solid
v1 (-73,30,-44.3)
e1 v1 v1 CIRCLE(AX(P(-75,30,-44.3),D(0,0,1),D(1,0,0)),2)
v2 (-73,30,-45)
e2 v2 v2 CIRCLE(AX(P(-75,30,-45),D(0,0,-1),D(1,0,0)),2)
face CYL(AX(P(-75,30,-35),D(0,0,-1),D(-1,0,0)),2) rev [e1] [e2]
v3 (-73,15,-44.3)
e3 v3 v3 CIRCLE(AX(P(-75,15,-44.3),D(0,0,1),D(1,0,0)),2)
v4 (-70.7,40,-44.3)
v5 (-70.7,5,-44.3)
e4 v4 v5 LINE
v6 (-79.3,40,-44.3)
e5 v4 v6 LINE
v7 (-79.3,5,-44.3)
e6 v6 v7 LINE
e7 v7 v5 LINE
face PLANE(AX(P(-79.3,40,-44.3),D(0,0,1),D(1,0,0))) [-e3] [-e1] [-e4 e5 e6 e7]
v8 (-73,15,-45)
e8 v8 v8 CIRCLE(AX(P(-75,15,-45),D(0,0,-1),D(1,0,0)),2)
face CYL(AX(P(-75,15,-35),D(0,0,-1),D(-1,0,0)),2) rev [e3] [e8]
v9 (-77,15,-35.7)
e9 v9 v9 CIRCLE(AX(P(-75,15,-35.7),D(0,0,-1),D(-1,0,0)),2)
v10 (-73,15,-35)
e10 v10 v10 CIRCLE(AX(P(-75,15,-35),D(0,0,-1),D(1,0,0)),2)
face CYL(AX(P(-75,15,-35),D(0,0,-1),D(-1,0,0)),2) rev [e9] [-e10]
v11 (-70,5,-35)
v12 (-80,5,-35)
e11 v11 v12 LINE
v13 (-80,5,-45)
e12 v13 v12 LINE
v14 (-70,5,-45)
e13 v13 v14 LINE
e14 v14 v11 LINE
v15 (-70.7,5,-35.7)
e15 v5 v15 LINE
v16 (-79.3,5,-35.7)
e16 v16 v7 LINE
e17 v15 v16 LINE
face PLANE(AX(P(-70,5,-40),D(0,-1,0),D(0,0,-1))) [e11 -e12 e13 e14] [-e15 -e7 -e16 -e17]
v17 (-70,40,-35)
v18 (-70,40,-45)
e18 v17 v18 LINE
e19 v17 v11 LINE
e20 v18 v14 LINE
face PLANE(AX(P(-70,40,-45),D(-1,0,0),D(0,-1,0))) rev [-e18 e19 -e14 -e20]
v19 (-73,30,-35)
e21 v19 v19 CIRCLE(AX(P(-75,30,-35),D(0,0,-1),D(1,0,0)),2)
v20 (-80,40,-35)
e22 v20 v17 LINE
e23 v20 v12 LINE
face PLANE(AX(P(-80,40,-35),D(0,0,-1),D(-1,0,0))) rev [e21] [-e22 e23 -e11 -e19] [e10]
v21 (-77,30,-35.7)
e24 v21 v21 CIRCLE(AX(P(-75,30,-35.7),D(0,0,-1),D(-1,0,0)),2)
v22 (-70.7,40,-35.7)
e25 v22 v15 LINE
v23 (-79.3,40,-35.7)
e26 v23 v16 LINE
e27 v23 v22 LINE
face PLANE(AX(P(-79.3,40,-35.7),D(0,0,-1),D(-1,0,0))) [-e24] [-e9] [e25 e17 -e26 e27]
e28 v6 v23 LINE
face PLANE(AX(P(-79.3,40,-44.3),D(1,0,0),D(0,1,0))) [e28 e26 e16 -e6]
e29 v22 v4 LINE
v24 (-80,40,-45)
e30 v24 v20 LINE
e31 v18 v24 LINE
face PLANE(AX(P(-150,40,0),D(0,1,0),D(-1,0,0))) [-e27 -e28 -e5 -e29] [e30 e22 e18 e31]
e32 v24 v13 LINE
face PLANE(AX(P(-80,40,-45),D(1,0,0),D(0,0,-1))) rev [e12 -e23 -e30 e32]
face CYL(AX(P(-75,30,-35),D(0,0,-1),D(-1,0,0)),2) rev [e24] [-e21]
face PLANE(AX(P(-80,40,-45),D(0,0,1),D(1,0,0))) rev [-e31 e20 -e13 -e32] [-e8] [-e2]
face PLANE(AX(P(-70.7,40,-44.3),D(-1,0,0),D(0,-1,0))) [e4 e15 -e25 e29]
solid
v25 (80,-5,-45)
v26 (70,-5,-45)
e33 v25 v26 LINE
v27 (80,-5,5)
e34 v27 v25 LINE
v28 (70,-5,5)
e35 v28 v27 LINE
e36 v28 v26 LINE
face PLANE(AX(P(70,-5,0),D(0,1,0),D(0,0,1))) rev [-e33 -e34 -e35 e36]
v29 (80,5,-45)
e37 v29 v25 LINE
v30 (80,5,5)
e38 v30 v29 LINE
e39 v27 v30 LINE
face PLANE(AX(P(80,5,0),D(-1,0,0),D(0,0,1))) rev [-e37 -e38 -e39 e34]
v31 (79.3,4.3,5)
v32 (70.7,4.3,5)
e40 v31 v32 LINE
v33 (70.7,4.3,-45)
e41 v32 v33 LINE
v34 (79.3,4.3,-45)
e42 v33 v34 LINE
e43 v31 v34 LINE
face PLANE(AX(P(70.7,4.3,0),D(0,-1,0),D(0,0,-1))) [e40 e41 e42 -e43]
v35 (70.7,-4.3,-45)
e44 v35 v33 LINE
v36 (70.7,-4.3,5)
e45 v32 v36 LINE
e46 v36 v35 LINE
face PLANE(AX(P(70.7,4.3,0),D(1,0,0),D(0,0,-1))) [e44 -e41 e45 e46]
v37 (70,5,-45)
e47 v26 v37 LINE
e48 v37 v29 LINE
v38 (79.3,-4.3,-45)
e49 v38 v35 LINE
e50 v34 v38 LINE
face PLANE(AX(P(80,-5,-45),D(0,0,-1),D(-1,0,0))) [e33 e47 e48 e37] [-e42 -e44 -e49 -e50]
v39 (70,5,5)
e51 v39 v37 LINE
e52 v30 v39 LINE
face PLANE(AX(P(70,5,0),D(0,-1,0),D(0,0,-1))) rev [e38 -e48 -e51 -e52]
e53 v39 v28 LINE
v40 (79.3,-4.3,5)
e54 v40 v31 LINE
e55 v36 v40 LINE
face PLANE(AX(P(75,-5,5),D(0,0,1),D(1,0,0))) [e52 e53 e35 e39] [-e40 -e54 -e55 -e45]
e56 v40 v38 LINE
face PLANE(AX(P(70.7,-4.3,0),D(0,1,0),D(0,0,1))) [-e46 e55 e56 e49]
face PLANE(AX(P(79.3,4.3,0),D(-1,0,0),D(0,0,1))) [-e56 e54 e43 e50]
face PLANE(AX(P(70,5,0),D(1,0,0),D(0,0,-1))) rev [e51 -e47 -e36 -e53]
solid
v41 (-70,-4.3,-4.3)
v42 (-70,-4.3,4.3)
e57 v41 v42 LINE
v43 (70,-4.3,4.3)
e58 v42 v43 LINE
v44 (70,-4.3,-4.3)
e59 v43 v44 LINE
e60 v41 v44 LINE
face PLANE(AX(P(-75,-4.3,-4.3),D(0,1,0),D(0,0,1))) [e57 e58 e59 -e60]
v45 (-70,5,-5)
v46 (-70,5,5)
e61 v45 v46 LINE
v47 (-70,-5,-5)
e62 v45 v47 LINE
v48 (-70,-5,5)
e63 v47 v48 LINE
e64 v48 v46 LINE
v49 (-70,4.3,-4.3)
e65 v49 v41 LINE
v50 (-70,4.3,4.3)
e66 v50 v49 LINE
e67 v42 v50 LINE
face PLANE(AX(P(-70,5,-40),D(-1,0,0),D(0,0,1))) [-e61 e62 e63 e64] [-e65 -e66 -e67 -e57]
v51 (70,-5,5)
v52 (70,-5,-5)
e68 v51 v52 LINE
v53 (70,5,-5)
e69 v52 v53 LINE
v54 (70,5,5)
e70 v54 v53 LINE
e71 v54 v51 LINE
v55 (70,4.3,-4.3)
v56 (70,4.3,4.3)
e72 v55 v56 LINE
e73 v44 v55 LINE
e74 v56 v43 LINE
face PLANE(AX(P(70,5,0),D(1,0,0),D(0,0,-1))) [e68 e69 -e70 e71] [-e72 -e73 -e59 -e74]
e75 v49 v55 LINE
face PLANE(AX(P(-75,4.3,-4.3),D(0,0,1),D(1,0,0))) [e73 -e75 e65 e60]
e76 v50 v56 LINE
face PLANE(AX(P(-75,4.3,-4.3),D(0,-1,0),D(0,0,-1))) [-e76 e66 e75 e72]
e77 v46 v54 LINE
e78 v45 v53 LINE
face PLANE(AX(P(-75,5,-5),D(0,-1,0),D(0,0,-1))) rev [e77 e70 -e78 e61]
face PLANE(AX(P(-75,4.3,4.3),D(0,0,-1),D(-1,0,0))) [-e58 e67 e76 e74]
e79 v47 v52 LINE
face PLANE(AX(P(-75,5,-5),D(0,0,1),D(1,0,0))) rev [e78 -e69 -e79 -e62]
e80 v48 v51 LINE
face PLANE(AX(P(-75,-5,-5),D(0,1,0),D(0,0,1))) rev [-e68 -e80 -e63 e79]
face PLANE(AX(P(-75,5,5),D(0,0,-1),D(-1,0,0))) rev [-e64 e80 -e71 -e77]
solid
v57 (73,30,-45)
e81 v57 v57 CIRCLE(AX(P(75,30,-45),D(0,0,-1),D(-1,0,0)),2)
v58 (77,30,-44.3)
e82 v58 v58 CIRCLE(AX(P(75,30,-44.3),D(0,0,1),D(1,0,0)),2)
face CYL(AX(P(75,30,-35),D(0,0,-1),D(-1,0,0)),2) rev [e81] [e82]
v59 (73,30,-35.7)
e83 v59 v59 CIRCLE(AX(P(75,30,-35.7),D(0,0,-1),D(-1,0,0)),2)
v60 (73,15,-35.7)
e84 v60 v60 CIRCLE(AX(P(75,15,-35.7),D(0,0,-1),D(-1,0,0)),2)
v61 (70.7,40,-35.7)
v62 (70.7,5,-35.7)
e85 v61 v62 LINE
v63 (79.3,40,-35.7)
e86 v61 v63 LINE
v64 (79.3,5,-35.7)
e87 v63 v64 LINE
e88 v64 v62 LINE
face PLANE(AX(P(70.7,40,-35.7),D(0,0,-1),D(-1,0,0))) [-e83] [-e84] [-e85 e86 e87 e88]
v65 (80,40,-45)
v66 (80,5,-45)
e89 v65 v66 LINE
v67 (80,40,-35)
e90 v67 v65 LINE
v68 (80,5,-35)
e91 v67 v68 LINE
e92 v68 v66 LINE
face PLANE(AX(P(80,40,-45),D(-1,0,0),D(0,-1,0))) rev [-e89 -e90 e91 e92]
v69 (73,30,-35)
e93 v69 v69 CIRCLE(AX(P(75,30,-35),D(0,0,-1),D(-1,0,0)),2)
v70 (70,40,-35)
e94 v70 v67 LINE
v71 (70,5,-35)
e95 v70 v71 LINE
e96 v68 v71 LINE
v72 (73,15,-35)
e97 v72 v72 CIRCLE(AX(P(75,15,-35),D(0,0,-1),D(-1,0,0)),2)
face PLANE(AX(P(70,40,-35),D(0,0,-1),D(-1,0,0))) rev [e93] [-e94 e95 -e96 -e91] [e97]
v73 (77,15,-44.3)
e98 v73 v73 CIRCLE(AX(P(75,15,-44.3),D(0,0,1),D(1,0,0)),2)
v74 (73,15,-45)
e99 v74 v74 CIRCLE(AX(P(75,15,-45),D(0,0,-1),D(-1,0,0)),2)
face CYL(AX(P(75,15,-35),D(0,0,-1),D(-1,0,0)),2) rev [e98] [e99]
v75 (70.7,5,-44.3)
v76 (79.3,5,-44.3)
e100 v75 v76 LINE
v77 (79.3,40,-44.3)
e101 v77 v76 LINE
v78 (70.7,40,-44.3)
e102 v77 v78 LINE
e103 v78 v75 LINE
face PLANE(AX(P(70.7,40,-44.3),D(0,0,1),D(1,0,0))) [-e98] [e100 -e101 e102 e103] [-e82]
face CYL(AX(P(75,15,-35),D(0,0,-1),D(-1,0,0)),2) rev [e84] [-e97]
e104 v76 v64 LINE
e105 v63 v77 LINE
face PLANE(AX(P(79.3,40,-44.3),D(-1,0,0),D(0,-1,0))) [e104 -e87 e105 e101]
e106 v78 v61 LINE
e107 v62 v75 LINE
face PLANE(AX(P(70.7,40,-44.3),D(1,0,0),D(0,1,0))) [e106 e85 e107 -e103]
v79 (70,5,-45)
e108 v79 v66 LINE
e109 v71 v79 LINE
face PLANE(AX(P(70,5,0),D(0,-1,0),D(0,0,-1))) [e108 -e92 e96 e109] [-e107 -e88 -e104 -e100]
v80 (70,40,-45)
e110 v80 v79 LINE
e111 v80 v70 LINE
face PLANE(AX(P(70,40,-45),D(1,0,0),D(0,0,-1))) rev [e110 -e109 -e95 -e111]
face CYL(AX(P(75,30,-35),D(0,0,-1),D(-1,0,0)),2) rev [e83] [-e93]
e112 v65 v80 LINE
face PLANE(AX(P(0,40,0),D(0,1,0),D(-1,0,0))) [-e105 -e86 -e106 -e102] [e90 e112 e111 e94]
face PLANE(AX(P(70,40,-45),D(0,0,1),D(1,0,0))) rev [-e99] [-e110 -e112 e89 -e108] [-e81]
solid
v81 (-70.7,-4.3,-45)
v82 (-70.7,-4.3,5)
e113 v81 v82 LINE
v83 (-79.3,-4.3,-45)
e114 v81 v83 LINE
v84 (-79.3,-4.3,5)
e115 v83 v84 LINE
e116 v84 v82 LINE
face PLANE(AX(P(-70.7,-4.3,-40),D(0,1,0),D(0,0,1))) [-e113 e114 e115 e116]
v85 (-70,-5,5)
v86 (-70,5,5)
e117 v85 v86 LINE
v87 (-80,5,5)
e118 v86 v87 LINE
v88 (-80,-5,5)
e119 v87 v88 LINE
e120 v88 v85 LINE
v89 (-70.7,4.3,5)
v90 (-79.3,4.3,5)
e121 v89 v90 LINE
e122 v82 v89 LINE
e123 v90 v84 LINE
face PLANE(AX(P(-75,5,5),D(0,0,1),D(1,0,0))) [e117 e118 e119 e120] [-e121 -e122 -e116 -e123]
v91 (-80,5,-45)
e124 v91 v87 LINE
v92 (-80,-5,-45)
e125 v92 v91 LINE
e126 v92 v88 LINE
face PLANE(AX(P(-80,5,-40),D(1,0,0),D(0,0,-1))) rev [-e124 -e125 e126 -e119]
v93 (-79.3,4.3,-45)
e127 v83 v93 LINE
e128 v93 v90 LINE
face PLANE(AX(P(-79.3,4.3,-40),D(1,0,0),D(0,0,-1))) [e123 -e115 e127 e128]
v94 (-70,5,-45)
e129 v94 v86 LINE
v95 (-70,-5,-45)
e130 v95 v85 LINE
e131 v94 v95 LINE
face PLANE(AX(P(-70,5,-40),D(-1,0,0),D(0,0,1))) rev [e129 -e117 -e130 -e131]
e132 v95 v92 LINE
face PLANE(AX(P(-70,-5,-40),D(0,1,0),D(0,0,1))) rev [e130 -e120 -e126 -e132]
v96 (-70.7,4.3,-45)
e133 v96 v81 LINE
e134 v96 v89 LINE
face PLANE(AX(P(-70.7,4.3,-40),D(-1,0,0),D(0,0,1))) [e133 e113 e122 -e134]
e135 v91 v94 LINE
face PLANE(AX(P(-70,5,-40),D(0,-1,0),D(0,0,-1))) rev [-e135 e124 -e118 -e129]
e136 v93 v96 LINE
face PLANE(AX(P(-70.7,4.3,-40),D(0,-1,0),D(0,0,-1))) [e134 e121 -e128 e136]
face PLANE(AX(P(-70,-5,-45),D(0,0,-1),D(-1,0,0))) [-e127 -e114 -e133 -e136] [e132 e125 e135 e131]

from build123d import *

# Parameters (mm, degrees)
SKETCH_11_ON_SEGMENT_1_W   = 10
SKETCH_11_ON_SEGMENT_1_H   = 10
SKETCH_11_ON_SEGMENT_1_W_2 = 8.6
SKETCH_11_ON_SEGMENT_1_H_2 = 8.6
F_10X10X0_7_1_DEPTH        = 48.071067812
SKETCH_11_ON_SEGMENT_2_W   = 10
SKETCH_11_ON_SEGMENT_2_H   = 10
SKETCH_11_ON_SEGMENT_2_W_2 = 8.6
SKETCH_11_ON_SEGMENT_2_H_2 = 8.6
F_10X10X0_7_1_2_DEPTH      = 166.142135624
F_10X10X0_7_1_3_DEPTH      = 40
F_10X10X0_7_1_3_DEPTH_BACK = 8.071067812
SKETCH_11_W                = 10
SKETCH_11_H                = 10
SKETCH_11_W_2              = 8.6
SKETCH_11_H_2              = 8.6
SKETCH_14_W                = 10
SKETCH_14_H                = 10
SKETCH_14_W_2              = 8.6
SKETCH_14_H_2              = 8.6
F_10X10X0_7_5_DEPTH        = 45
SKETCH_14_ON_SEGMENT_2_W   = 10
SKETCH_14_ON_SEGMENT_2_H   = 10
SKETCH_14_ON_SEGMENT_2_W_2 = 8.6
SKETCH_14_ON_SEGMENT_2_H_2 = 8.6
F_10X10X0_7_5_2_DEPTH      = 45
PART_START                 = 22.5
PART_RUN_ON_DEPTH          = 27.5
BODY_START                 = 17.5
BODY_3_RUN_ON_DEPTH        = 27.5
WELD_START                 = -5
WELD_TRIM_4_DEPTH          = 10
WELD_TRIM_4_2_DEPTH        = 0.7
WELD_START_2               = 4.3
WELD_TRIM_4_3_DEPTH        = 0.7
WELD_START_3               = 70
WELD_TRIM_4_4_OUTLINE_W    = 12
WELD_TRIM_4_4_OUTLINE_H    = 14
WELD_TRIM_4_4_DEPTH        = 10
WELD_START_4               = -80
WELD_TRIM_5_OUTLINE_W      = 12
WELD_TRIM_5_OUTLINE_H      = 13
WELD_TRIM_5_DEPTH          = 10
WELD_TRIM_5_2_DEPTH        = 10
WELD_TRIM_5_3_DEPTH        = 0.7
WELD_TRIM_5_4_DEPTH        = 0.7
SKETCH_15_R                = 2
CUT_EXTRUDE_1_DEPTH        = 10


# Read off the part's stored shape, not the designer's step: 剪裁/延伸4, 剪裁/延伸5
with BuildPart() as part:
    # 草图11 on segment 1 (carried to segment 1) → 常用材料 不锈钢10X10X0.7(1) (new body)
    with BuildSketch(Plane(origin=(75, 0, -40), x_dir=(1, 0, 0), z_dir=(0, 0, 1))):
        Rectangle(SKETCH_11_ON_SEGMENT_1_W, SKETCH_11_ON_SEGMENT_1_H)
        Rectangle(SKETCH_11_ON_SEGMENT_1_W_2, SKETCH_11_ON_SEGMENT_1_H_2, mode=Mode.SUBTRACT)
    extrude(amount=F_10X10X0_7_1_DEPTH)

    # 常用材料 不锈钢10X10X0.7(1) mitre 1
    split(bisect_by=Plane(origin=(75, 0, 0), x_dir=(0, 1, 0), z_dir=(0.707106781, 0, -0.707106781)), keep=Keep.TOP)

    # part cut square before the run-on
    split(bisect_by=Plane(origin=(75, 0, -17.5), x_dir=(0, -1, 0), z_dir=(0, 0, 1)), keep=Keep.TOP)

    # 草图11 on segment 1 (carried to segment 1) → part run on (add)
    with BuildSketch(Plane(origin=(75, 0, -40), x_dir=(1, 0, 0), z_dir=(0, 0, 1)).offset(PART_START)):
        Rectangle(SKETCH_11_ON_SEGMENT_1_W, SKETCH_11_ON_SEGMENT_1_H)
        Rectangle(SKETCH_11_ON_SEGMENT_1_W_2, SKETCH_11_ON_SEGMENT_1_H_2, mode=Mode.SUBTRACT)
    extrude(amount=-PART_RUN_ON_DEPTH)

    # Weld Trim 4 outline → Weld Trim 4 (add)
    with BuildSketch(Plane(origin=(0, 0, 0), x_dir=(1, 0, 0), z_dir=(0, 1, 0)).offset(WELD_START)):
        Polygon((70, 5), (70, -5), (70.7, -5), (70.7, 4.3), align=None)
        Polygon((79.3, -4.3), (79.3, -5), (80, -5), align=None)
    extrude(amount=WELD_TRIM_4_DEPTH)

    # Weld Trim 4 2 outline → Weld Trim 4 2 (add)
    with BuildSketch(Plane(origin=(0, 0, 0), x_dir=(1, 0, 0), z_dir=(0, 1, 0)).offset(WELD_START)):
        Polygon((70.7, 4.3), (70.7, -5), (79.3, -5), (79.3, -4.3), align=None)
    extrude(amount=WELD_TRIM_4_2_DEPTH)

    # Weld Trim 4 3 outline → Weld Trim 4 3 (add)
    with BuildSketch(Plane(origin=(0, 0, 0), x_dir=(1, 0, 0), z_dir=(0, 1, 0)).offset(WELD_START_2)):
        Polygon((70.7, 4.3), (70.7, -5), (79.3, -5), (79.3, -4.3), align=None)
    extrude(amount=WELD_TRIM_4_3_DEPTH)


with BuildPart() as body_2:
    # 草图11 on segment 2 (carried to segment 2) → 10X10X0.7_1 2 (new body)
    with BuildSketch(Plane.ZY.offset(-83.071067812)):
        Rectangle(SKETCH_11_ON_SEGMENT_2_W, SKETCH_11_ON_SEGMENT_2_H)
        Rectangle(SKETCH_11_ON_SEGMENT_2_W_2, SKETCH_11_ON_SEGMENT_2_H_2, mode=Mode.SUBTRACT)
    extrude(amount=F_10X10X0_7_1_2_DEPTH)

    # 10X10X0.7_1 2 mitre 1
    split(bisect_by=Plane(origin=(75, 0, 0), x_dir=(0, -1, 0), z_dir=(-0.707106781, 0, 0.707106781)), keep=Keep.TOP)

    # 10X10X0.7_1 2 mitre 2
    split(bisect_by=Plane(origin=(-75, 0, 0), x_dir=(0, 1, 0), z_dir=(0.707106781, 0, 0.707106781)), keep=Keep.TOP)

    # Weld Trim 4 4 outline → Weld Trim 4 4 (cut)
    with BuildSketch(Plane.YZ.offset(WELD_START_3)):
        Rectangle(WELD_TRIM_4_4_OUTLINE_W, WELD_TRIM_4_4_OUTLINE_H)
    extrude(amount=WELD_TRIM_4_4_DEPTH, mode=Mode.SUBTRACT)

    # Weld Trim 5 outline → Weld Trim 5 (cut)
    with BuildSketch(Plane.YZ.offset(WELD_START_4)):
        with Locations((0, 0.5)):
            Rectangle(WELD_TRIM_5_OUTLINE_W, WELD_TRIM_5_OUTLINE_H)
    extrude(amount=WELD_TRIM_5_DEPTH, mode=Mode.SUBTRACT)


with BuildPart() as body_3:
    # 草图11 → 10X10X0.7_1 3 (new, two sides: drawn at the far end of the back side and taken through both)
    with BuildSketch(Plane(origin=(-75, 0, 0), x_dir=(-1, 0, 0), z_dir=(0, 0, -1)).offset(-F_10X10X0_7_1_3_DEPTH_BACK)):
        Rectangle(SKETCH_11_W, SKETCH_11_H)
        Rectangle(SKETCH_11_W_2, SKETCH_11_H_2, mode=Mode.SUBTRACT)
    extrude(amount=F_10X10X0_7_1_3_DEPTH + F_10X10X0_7_1_3_DEPTH_BACK)

    # 10X10X0.7_1 3 mitre 1
    split(bisect_by=Plane(origin=(-75, 0, 0), x_dir=(0, -1, 0), z_dir=(-0.707106781, 0, -0.707106781)), keep=Keep.TOP)

    # body 3 cut square before the run-on
    split(bisect_by=Plane(origin=(-75, 0, -17.5), x_dir=(0, -1, 0), z_dir=(0, 0, 1)), keep=Keep.TOP)

    # 草图11 → body 3 run on (add)
    with BuildSketch(Plane(origin=(-75, 0, 0), x_dir=(-1, 0, 0), z_dir=(0, 0, -1)).offset(BODY_START)):
        Rectangle(SKETCH_11_W, SKETCH_11_H)
        Rectangle(SKETCH_11_W_2, SKETCH_11_H_2, mode=Mode.SUBTRACT)
    extrude(amount=BODY_3_RUN_ON_DEPTH)

    # Weld Trim 5 2 outline → Weld Trim 5 2 (add)
    with BuildSketch(Plane(origin=(0, 0, 0), x_dir=(1, 0, 0), z_dir=(0, 1, 0)).offset(WELD_START)):
        Polygon((-70, -5), (-70, 5), (-70.7, 4.3), (-70.7, -5), align=None)
        Polygon((-79.3, -5), (-79.3, -4.3), (-80, -5), align=None)
    extrude(amount=WELD_TRIM_5_2_DEPTH)

    # Weld Trim 5 3 outline → Weld Trim 5 3 (add)
    with BuildSketch(Plane(origin=(0, 0, 0), x_dir=(1, 0, 0), z_dir=(0, 1, 0)).offset(WELD_START)):
        Polygon((-70.7, -5), (-70.7, 4.3), (-79.3, -4.3), (-79.3, -5), align=None)
    extrude(amount=WELD_TRIM_5_3_DEPTH)

    # Weld Trim 5 4 outline → Weld Trim 5 4 (add)
    with BuildSketch(Plane(origin=(0, 0, 0), x_dir=(1, 0, 0), z_dir=(0, 1, 0)).offset(WELD_START_2)):
        Polygon((-70.7, -5), (-70.7, 4.3), (-79.3, -4.3), (-79.3, -5), align=None)
    extrude(amount=WELD_TRIM_5_4_DEPTH)


with BuildPart() as body_4:
    # 草图14 → 常用材料 不锈钢10X10X0.7(5) (new body)
    with BuildSketch(Plane(origin=(75, -5, -40), x_dir=(1, 0, 0), z_dir=(0, 1, 0))):
        Rectangle(SKETCH_14_W, SKETCH_14_H)
        Rectangle(SKETCH_14_W_2, SKETCH_14_H_2, mode=Mode.SUBTRACT)
    extrude(amount=F_10X10X0_7_5_DEPTH)

    # Weld Trim 1 3
    split(bisect_by=Plane(origin=(75.208333333, 5, -19.895833333), x_dir=(-1, 0, 0), z_dir=(0, 1, 0)), keep=Keep.TOP)


with BuildPart() as body_5:
    # 草图14 on segment 2 (carried to segment 2) → 10X10X0.7_5 2 (new body)
    with BuildSketch(Plane(origin=(-75, -5, -40), x_dir=(1, 0, 0), z_dir=(0, 1, 0))):
        Rectangle(SKETCH_14_ON_SEGMENT_2_W, SKETCH_14_ON_SEGMENT_2_H)
        Rectangle(SKETCH_14_ON_SEGMENT_2_W_2, SKETCH_14_ON_SEGMENT_2_H_2, mode=Mode.SUBTRACT)
    extrude(amount=F_10X10X0_7_5_2_DEPTH)

    # Weld Trim 2 3
    split(bisect_by=Plane(origin=(-75.208333333, 5, -19.895833333), x_dir=(-1, 0, 0), z_dir=(0, 1, 0)), keep=Keep.TOP)


with BuildPart() as cut_extrude_1_tool:
    # 草图15 → 切除-拉伸1 (new body)
    with BuildSketch(Plane(origin=(0, 0, -45), x_dir=(-1, 0, 0), z_dir=(0, 0, -1))):
        with Locations((-75, 30)):
            Circle(SKETCH_15_R)
        with Locations((-75, 15)):
            Circle(SKETCH_15_R)
        with Locations(Location((75, 30, 0), (0, 0, 180))):
            Circle(SKETCH_15_R)
        with Locations(Location((75, 15, 0), (0, 0, 180))):
            Circle(SKETCH_15_R)
    extrude(amount=-CUT_EXTRUDE_1_DEPTH)


with BuildPart() as body_4_1:
    add(body_4.part)

    # 切除-拉伸1: cut by cut_extrude_1_tool
    add(cut_extrude_1_tool.part, mode=Mode.SUBTRACT)


with BuildPart() as body_5_1:
    add(body_5.part)

    # 切除-拉伸1: cut by cut_extrude_1_tool
    add(cut_extrude_1_tool.part, mode=Mode.SUBTRACT)


solid = Compound([part.part, body_2.part, body_3.part, body_4_1.part, body_5_1.part])
